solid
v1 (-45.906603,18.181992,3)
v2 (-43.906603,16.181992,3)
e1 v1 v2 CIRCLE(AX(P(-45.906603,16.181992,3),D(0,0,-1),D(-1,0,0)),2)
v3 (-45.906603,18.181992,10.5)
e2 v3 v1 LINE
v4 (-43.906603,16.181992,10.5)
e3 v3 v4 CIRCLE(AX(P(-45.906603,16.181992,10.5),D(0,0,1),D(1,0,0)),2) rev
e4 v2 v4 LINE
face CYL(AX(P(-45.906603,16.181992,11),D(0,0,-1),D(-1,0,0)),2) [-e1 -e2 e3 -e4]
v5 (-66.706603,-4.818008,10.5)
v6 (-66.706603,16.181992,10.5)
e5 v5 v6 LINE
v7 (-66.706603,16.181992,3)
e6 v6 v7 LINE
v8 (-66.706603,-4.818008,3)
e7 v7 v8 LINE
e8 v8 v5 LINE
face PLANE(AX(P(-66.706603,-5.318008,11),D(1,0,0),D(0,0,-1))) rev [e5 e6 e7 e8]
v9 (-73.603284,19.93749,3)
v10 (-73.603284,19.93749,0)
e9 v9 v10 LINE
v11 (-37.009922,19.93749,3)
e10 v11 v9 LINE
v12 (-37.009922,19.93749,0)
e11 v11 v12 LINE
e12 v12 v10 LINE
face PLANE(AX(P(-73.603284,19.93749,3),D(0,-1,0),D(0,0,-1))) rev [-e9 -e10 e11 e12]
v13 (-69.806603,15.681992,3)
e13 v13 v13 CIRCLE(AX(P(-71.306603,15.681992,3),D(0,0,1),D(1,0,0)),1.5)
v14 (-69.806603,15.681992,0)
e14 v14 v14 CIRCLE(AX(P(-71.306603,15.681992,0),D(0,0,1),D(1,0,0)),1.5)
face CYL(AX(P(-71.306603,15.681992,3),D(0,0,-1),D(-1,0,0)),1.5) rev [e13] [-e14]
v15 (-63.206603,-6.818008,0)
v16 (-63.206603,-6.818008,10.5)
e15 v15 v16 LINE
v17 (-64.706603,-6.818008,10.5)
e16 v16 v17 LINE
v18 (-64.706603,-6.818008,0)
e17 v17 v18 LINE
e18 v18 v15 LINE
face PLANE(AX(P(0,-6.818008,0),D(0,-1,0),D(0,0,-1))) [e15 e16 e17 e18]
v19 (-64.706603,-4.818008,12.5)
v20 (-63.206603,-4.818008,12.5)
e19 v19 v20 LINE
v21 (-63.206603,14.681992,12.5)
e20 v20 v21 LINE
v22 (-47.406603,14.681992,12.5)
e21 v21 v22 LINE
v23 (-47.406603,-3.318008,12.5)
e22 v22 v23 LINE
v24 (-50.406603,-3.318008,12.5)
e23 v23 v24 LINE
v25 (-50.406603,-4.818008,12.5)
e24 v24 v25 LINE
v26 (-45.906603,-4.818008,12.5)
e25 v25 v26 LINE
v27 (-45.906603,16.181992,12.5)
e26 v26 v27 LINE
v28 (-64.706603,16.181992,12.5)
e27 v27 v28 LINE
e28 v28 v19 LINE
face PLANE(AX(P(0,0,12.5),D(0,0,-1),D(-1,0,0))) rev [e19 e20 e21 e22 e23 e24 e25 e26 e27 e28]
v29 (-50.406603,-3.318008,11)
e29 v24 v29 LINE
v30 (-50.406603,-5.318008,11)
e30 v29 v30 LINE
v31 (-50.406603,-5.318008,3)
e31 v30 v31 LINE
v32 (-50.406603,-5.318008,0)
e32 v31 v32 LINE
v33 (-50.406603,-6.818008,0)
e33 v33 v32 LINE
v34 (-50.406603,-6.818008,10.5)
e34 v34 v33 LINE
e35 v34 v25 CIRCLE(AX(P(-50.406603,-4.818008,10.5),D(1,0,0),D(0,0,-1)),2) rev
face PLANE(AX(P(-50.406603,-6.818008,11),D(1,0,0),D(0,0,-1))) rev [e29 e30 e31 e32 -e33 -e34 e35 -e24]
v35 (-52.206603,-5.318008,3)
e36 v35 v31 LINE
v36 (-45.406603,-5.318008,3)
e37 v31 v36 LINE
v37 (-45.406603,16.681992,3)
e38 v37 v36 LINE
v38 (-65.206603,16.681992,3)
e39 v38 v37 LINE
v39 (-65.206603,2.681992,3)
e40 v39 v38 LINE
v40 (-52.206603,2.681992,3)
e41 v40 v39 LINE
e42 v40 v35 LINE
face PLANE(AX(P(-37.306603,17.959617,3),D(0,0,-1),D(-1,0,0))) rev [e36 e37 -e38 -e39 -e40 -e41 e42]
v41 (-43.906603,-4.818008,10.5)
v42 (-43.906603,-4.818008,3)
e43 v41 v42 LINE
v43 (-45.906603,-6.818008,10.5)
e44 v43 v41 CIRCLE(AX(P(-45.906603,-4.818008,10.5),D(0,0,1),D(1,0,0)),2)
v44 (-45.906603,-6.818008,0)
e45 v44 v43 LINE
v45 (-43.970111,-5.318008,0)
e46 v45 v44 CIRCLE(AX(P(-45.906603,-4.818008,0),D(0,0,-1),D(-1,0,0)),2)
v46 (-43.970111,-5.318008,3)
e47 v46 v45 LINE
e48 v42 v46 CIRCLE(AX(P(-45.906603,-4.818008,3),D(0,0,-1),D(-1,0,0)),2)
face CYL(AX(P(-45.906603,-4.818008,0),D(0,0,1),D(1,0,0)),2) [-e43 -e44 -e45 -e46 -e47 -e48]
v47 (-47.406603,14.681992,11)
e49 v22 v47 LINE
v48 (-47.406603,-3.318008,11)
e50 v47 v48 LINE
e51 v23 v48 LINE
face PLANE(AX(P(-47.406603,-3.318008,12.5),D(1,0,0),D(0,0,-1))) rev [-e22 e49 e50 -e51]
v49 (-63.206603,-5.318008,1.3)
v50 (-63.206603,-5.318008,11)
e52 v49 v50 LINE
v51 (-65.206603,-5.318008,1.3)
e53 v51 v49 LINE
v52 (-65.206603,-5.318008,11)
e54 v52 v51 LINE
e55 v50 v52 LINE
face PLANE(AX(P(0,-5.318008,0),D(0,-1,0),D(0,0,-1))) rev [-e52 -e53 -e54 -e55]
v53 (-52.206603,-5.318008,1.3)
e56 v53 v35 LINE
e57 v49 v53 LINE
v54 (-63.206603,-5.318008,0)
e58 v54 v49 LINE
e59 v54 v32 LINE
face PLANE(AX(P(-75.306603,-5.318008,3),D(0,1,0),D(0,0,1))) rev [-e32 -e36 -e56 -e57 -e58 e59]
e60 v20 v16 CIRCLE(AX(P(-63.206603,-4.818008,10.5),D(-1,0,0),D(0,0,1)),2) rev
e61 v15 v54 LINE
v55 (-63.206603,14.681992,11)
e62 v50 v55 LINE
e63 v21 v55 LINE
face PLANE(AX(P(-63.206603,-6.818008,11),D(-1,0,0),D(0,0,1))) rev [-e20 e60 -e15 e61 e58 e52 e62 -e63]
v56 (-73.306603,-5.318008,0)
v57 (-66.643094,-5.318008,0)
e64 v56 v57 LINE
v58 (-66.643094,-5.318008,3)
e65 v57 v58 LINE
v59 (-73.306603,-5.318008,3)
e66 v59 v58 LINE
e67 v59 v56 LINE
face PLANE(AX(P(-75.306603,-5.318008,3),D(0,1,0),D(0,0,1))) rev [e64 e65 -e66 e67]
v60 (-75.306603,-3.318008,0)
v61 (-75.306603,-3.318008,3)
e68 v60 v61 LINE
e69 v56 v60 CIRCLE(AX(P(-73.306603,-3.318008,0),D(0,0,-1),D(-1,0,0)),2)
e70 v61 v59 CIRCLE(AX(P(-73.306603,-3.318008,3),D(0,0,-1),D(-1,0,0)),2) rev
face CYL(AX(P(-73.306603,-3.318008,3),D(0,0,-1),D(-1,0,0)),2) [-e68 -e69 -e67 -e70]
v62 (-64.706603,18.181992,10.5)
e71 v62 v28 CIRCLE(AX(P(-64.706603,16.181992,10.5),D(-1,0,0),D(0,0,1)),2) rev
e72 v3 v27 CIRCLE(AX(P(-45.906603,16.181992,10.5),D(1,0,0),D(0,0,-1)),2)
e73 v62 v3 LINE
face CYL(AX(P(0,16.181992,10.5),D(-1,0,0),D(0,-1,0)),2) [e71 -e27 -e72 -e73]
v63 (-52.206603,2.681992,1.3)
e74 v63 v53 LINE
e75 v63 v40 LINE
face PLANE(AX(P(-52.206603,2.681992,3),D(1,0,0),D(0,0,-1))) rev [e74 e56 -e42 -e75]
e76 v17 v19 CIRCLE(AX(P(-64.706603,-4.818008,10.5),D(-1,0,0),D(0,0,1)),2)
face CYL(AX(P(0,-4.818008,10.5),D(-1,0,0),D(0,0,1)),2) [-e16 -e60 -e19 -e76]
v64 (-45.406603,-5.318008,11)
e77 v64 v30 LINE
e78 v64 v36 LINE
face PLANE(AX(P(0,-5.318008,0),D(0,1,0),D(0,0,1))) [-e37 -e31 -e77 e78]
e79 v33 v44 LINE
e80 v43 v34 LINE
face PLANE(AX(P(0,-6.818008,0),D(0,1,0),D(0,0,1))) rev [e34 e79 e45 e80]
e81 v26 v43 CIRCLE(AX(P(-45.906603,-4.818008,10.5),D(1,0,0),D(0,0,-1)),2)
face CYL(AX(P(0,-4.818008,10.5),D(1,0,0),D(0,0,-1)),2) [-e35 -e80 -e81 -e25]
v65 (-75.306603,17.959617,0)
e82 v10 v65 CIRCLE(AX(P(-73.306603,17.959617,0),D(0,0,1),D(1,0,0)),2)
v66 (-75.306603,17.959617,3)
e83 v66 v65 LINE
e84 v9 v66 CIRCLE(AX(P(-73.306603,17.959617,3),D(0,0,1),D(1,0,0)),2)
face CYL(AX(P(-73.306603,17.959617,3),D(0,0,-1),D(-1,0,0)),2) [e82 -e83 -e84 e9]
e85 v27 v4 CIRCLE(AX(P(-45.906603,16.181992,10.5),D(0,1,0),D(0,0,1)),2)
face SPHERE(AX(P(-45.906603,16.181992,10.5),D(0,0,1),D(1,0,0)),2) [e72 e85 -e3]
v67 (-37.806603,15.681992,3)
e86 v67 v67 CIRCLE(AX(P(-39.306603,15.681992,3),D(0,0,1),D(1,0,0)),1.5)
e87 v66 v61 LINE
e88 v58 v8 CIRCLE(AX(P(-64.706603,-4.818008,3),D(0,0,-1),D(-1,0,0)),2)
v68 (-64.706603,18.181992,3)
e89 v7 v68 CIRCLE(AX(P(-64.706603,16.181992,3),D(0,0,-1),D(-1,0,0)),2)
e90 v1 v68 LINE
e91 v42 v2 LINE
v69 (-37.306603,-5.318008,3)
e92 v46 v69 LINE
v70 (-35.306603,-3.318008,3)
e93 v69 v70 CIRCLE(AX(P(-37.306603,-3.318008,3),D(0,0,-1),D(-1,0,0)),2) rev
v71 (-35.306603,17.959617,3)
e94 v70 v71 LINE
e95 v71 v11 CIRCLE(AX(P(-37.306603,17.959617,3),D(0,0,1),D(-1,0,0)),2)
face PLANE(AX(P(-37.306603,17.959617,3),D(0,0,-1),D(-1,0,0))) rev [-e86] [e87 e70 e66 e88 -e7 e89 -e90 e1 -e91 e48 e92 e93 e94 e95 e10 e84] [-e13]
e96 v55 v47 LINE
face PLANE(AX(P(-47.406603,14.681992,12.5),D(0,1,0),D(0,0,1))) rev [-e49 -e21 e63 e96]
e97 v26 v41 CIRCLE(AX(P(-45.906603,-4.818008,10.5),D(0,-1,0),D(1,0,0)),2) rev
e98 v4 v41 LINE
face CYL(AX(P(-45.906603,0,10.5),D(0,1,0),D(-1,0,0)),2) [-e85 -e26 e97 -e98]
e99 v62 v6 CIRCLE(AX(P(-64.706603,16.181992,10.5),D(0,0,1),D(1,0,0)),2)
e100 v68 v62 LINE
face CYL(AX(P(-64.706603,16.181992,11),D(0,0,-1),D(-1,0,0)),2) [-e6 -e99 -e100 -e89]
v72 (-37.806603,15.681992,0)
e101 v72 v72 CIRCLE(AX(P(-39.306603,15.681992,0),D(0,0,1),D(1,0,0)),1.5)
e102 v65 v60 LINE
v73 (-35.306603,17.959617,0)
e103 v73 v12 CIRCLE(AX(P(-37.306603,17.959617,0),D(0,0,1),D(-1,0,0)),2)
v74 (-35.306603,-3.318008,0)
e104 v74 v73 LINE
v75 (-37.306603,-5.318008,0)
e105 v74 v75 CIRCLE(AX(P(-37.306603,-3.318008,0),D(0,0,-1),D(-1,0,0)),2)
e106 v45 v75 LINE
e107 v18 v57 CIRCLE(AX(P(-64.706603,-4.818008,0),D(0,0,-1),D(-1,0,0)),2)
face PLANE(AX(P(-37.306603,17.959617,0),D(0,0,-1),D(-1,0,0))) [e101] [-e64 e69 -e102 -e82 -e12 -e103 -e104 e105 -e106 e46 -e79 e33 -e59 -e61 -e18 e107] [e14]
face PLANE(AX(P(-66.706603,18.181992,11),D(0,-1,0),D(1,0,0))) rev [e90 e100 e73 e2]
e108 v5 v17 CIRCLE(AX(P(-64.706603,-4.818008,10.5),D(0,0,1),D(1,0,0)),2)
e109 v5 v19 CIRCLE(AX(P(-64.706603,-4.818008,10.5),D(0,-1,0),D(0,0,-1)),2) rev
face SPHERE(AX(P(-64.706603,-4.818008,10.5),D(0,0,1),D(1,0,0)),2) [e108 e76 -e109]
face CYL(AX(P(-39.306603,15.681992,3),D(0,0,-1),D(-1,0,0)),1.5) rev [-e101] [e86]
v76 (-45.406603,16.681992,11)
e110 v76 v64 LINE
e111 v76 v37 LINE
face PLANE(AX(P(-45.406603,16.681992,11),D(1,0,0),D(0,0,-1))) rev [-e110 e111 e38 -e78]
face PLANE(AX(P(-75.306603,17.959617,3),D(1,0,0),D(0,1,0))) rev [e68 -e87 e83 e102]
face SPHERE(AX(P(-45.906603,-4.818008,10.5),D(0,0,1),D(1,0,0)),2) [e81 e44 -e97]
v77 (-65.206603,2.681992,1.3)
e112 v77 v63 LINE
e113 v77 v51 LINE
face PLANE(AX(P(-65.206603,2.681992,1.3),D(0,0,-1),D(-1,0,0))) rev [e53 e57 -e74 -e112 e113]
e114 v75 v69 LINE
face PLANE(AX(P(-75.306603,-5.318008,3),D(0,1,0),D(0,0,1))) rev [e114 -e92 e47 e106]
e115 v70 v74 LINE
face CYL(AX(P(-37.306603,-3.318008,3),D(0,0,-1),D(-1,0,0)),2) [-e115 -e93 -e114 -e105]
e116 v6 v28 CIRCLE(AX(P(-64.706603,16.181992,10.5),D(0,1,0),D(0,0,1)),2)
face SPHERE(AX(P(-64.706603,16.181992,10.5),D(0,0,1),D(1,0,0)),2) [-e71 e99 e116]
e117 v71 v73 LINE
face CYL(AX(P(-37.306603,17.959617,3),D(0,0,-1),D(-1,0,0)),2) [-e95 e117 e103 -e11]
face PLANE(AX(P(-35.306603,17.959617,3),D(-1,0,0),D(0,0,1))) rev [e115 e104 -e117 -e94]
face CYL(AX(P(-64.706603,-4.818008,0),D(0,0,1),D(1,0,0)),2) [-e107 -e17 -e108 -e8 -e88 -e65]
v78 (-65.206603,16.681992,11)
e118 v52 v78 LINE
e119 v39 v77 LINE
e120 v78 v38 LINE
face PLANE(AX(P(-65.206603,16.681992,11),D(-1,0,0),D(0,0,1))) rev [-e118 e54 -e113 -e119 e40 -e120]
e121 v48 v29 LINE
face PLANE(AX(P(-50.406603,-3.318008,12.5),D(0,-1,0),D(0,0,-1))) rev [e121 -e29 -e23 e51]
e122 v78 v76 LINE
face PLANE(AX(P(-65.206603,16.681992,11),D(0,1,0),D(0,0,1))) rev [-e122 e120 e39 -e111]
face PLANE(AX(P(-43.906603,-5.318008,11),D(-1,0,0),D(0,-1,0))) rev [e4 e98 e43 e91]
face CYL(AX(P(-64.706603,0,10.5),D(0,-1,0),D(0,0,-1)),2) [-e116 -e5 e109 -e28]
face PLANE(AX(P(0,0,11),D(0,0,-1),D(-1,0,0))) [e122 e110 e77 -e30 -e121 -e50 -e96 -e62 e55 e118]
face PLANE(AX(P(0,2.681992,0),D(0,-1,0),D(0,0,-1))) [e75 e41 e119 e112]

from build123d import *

# Parameters (mm, degrees)
CROQUIS1_R              = 1.5
SALIENTE_EXTRUIR1_DEPTH = 3
SALIENTE_EXTRUIR2_DEPTH = 8
CROQUIS3_W              = 13
CROQUIS3_H              = 1.7
CORTAR_EXTRUIR1_DEPTH   = 8
CROQUIS5_W              = 3.5
CROQUIS5_H              = 11
CROQUIS5_W_2            = 6.5
SALIENTE_EXTRUIR3_DEPTH = 1.5
SALIENTE_EXTRUIR4_DEPTH = 1.5
REDONDEO1_R             = 2


with BuildPart() as part:
    # Croquis1 → Saliente-Extruir1 (new body)
    with BuildSketch(Plane.XY):
        with BuildLine():
            Line((-75.306602598, 17.959617496), (-75.306602598, -5.318007663))
            Line((-75.306602598, -5.318007663), (-35.306602598, -5.318007663))
            Line((-35.306602598, -5.318007663), (-35.306602598, 17.959617496))
            ThreePointArc((-35.306602598, 17.959617496), (-35.791122177, 19.26473017), (-37.009921692, 19.937490201))
            Line((-37.009921692, 19.937490201), (-73.603283504, 19.937490201))
            ThreePointArc((-73.603283504, 19.937490201), (-74.822083019, 19.26473017), (-75.306602598, 17.959617496))
        make_face()
        with Locations((-71.306602598, 15.681992337)):
            Circle(CROQUIS1_R, mode=Mode.SUBTRACT)
        with Locations((-39.306602598, 15.681992337)):
            Circle(CROQUIS1_R, mode=Mode.SUBTRACT)
    extrude(amount=SALIENTE_EXTRUIR1_DEPTH)

    # Croquis2 → Saliente-Extruir2 (add)
    with BuildSketch(Plane.XY.offset(3)):
        Polygon((-66.706602598, -5.318007663), (-65.206602598, -5.318007663), (-65.206602598, 16.681992337), (-45.406602598, 16.681992337), (-45.406602598, -5.318007663), (-43.906602598, -5.318007663), (-43.906602598, 18.181992337), (-66.706602598, 18.181992337), align=None)
    extrude(amount=SALIENTE_EXTRUIR2_DEPTH)

    # Croquis3 → Cortar-Extruir1 (cut)
    with BuildSketch(Plane.XZ.offset(5.318007663)):
        with Locations((-58.706602598, 2.15)):
            Rectangle(CROQUIS3_W, CROQUIS3_H)
    extrude(amount=-CORTAR_EXTRUIR1_DEPTH, mode=Mode.SUBTRACT)

    # Croquis5 → Saliente-Extruir3 (add)
    with BuildSketch(Plane.XZ.offset(5.318007663)):
        with Locations((-64.956602598, 5.5)):
            Rectangle(CROQUIS5_W, CROQUIS5_H)
        with Locations((-47.156602598, 5.5)):
            Rectangle(CROQUIS5_W_2, CROQUIS5_H)
    extrude(amount=SALIENTE_EXTRUIR3_DEPTH)

    # Croquis6 → Saliente-Extruir4 (add)
    with BuildSketch(Plane.XY.offset(11)):
        Polygon((-63.206602598, -5.318007663), (-63.206602598, -6.818007663), (-66.706602598, -6.818007663), (-66.706602598, 18.181992337), (-43.906602598, 18.181992337), (-43.906602598, -6.818007663), (-50.406602598, -6.818007663), (-50.406602598, -3.318007663), (-47.406602598, -3.318007663), (-47.406602598, 14.681992337), (-63.206602598, 14.681992337), align=None)
    extrude(amount=SALIENTE_EXTRUIR4_DEPTH)

    # Redondeo1
    # the kernel refuses this fillet: 2 mm, written as the material it takes off along each edge
    with BuildSketch(Plane(origin=(-45.906602598, -4.818007663, 10.5), x_dir=(1, 0, 0), z_dir=(0, 0, 1))) as redondeo1_piece_1_section:
        Polygon((0, 0), (REDONDEO1_R * 1.02, 0), (REDONDEO1_R * 1.02, -REDONDEO1_R * 1.02), (0, -REDONDEO1_R * 1.02), align=None)
    redondeo1_piece_1 = extrude(amount=REDONDEO1_R * 1.02, mode=Mode.PRIVATE)
    redondeo1_piece_1 = redondeo1_piece_1 - Plane(origin=(-45.906602598, -4.818007663, 10.5), x_dir=(-0.7071067811865477, 0.7071067811865474, 0), z_dir=(0, 0, 1)) * Sphere(REDONDEO1_R, mode=Mode.PRIVATE)
    add(redondeo1_piece_1, mode=Mode.SUBTRACT)
    with BuildSketch(Plane(origin=(-45.906602598, 16.181992337, 10.5), x_dir=(0, 1, 0), z_dir=(0, 0, 1))) as redondeo1_piece_2_section:
        Polygon((0, 0), (REDONDEO1_R * 1.02, 0), (REDONDEO1_R * 1.02, -REDONDEO1_R * 1.02), (0, -REDONDEO1_R * 1.02), align=None)
    redondeo1_piece_2 = extrude(amount=REDONDEO1_R * 1.02, mode=Mode.PRIVATE)
    redondeo1_piece_2 = redondeo1_piece_2 - Plane(origin=(-45.906602598, 16.181992337, 10.5), x_dir=(-0.7071067811865471, -0.7071067811865477, 0), z_dir=(0, 0, 1)) * Sphere(REDONDEO1_R, mode=Mode.PRIVATE)
    add(redondeo1_piece_2, mode=Mode.SUBTRACT)
    with BuildSketch(Plane(origin=(-64.706602598, 16.181992337, 10.5), x_dir=(0, 1, 0), z_dir=(0, 0, 1))) as redondeo1_piece_3_section:
        Polygon((0, 0), (REDONDEO1_R * 1.02, 0), (REDONDEO1_R * 1.02, REDONDEO1_R * 1.02), (0, REDONDEO1_R * 1.02), align=None)
    redondeo1_piece_3 = extrude(amount=REDONDEO1_R * 1.02, mode=Mode.PRIVATE)
    redondeo1_piece_3 = redondeo1_piece_3 - Plane(origin=(-64.706602598, 16.181992337, 10.5), x_dir=(0.7071067811865477, -0.7071067811865475, 0), z_dir=(0, 0, 1)) * Sphere(REDONDEO1_R, mode=Mode.PRIVATE)
    add(redondeo1_piece_3, mode=Mode.SUBTRACT)
    with BuildSketch(Plane(origin=(-64.706602598, -4.818007663, 10.5), x_dir=(-1, 0, 0), z_dir=(0, 0, 1))) as redondeo1_piece_4_section:
        Polygon((0, 0), (REDONDEO1_R * 1.02, 0), (REDONDEO1_R * 1.02, REDONDEO1_R * 1.02), (0, REDONDEO1_R * 1.02), align=None)
    redondeo1_piece_4 = extrude(amount=REDONDEO1_R * 1.02, mode=Mode.PRIVATE)
    redondeo1_piece_4 = redondeo1_piece_4 - Plane(origin=(-64.706602598, -4.818007663, 10.5), x_dir=(0.7071067811865475, 0.7071067811865475, 0), z_dir=(0, 0, 1)) * Sphere(REDONDEO1_R, mode=Mode.PRIVATE)
    add(redondeo1_piece_4, mode=Mode.SUBTRACT)
    with BuildSketch(Plane(origin=(-35.306602598, -5.318007663, -5), x_dir=(-1, 0, 0), z_dir=(0, 0, 1))) as redondeo1_piece_5:
        with BuildLine():
            CenterArc((REDONDEO1_R, -REDONDEO1_R), REDONDEO1_R, 90, 90)
            Line((0, -REDONDEO1_R), (0, 0))
            Line((0, 0), (REDONDEO1_R, 0))
        make_face()
    extrude(amount=13, mode=Mode.SUBTRACT)
    with BuildSketch(Plane(origin=(-45.906602598, -6.818007663, 12.5), x_dir=(0, 0, -1), z_dir=(-1, 0, 0))) as redondeo1_piece_6:
        with BuildLine():
            CenterArc((REDONDEO1_R, -REDONDEO1_R), REDONDEO1_R, 90, 90)
            Line((0, -REDONDEO1_R), (0, 0))
            Line((0, 0), (REDONDEO1_R, 0))
        make_face()
    extrude(amount=9.5, mode=Mode.SUBTRACT)
    with BuildSketch(Plane(origin=(-43.906602598, 16.181992337, 12.5), x_dir=(-1, 0, 0), z_dir=(0, -1, 0))) as redondeo1_piece_7:
        with BuildLine():
            CenterArc((REDONDEO1_R, REDONDEO1_R), REDONDEO1_R, 180, 90)
            Line((0, REDONDEO1_R), (0, 0))
            Line((0, 0), (REDONDEO1_R, 0))
        make_face()
    extrude(amount=21, mode=Mode.SUBTRACT)
    with BuildSketch(Plane(origin=(-64.706602598, 18.181992337, 12.5), x_dir=(0, -1, 0), z_dir=(1, 0, 0))) as redondeo1_piece_8:
        with BuildLine():
            CenterArc((REDONDEO1_R, REDONDEO1_R), REDONDEO1_R, 180, 90)
            Line((0, REDONDEO1_R), (0, 0))
            Line((0, 0), (REDONDEO1_R, 0))
        make_face()
    extrude(amount=18.8, mode=Mode.SUBTRACT)
    with BuildSketch(Plane(origin=(-75.306602598, -5.318007663, -5), x_dir=(1, 0, 0), z_dir=(0, 0, 1))) as redondeo1_piece_9:
        with BuildLine():
            CenterArc((REDONDEO1_R, REDONDEO1_R), REDONDEO1_R, 180, 90)
            Line((0, REDONDEO1_R), (0, 0))
            Line((0, 0), (REDONDEO1_R, 0))
        make_face()
    extrude(amount=13, mode=Mode.SUBTRACT)
    with BuildSketch(Plane(origin=(-66.706602598, -4.818007663, 12.5), x_dir=(0, 0, -1), z_dir=(0, 1, 0))) as redondeo1_piece_10:
        with BuildLine():
            CenterArc((REDONDEO1_R, -REDONDEO1_R), REDONDEO1_R, 90, 90)
            Line((0, -REDONDEO1_R), (0, 0))
            Line((0, 0), (REDONDEO1_R, 0))
        make_face()
    extrude(amount=21, mode=Mode.SUBTRACT)
    with BuildSketch(Plane(origin=(-58.206602598, -6.818007663, 12.5), x_dir=(0, 0, -1), z_dir=(-1, 0, 0))) as redondeo1_piece_11:
        with BuildLine():
            CenterArc((REDONDEO1_R, -REDONDEO1_R), REDONDEO1_R, 90, 90)
            Line((0, -REDONDEO1_R), (0, 0))
            Line((0, 0), (REDONDEO1_R, 0))
        make_face()
    extrude(amount=6.5, mode=Mode.SUBTRACT)
    with BuildSketch(Plane(origin=(-66.706602598, 18.181992337, 10.5), x_dir=(0, -1, 0), z_dir=(0, 0, -1))) as redondeo1_piece_12:
        with BuildLine():
            CenterArc((REDONDEO1_R, -REDONDEO1_R), REDONDEO1_R, 90, 90)
            Line((0, -REDONDEO1_R), (0, 0))
            Line((0, 0), (REDONDEO1_R, 0))
        make_face()
    extrude(amount=7.5, mode=Mode.SUBTRACT)
    with BuildSketch(Plane(origin=(-43.906602598, 18.181992337, 3), x_dir=(-1, 0, 0), z_dir=(0, 0, 1))) as redondeo1_piece_13:
        with BuildLine():
            CenterArc((REDONDEO1_R, REDONDEO1_R), REDONDEO1_R, 180, 90)
            Line((0, REDONDEO1_R), (0, 0))
            Line((0, 0), (REDONDEO1_R, 0))
        make_face()
    extrude(amount=7.5, mode=Mode.SUBTRACT)
    with BuildSketch(Plane(origin=(-66.706602598, -6.818007663, -5), x_dir=(0, 1, 0), z_dir=(0, 0, 1))) as redondeo1_piece_14_section:
        with BuildLine():
            CenterArc((REDONDEO1_R, -REDONDEO1_R), REDONDEO1_R, 90, 90)
            Line((0, -REDONDEO1_R), (0, 0))
            Line((0, 0), (REDONDEO1_R, 0))
        make_face()
    redondeo1_piece_14 = extrude(amount=15.5, mode=Mode.PRIVATE)
    redondeo1_piece_14 = split(redondeo1_piece_14, bisect_by=Plane(origin=(-66.254561414, -5.318007663, 1.5), z_dir=(0, -1, 0)), keep=Keep.TOP, mode=Mode.PRIVATE)
    add(redondeo1_piece_14, mode=Mode.SUBTRACT)
    with BuildSketch(Plane(origin=(-66.706602598, -6.818007663, -5), x_dir=(0, 1, 0), z_dir=(0, 0, 1))) as redondeo1_piece_15_section:
        with BuildLine():
            CenterArc((REDONDEO1_R, -REDONDEO1_R), REDONDEO1_R, 90, 90)
            Line((0, -REDONDEO1_R), (0, 0))
            Line((0, 0), (REDONDEO1_R, 0))
        make_face()
    redondeo1_piece_15 = extrude(amount=15.5, mode=Mode.PRIVATE)
    redondeo1_piece_15 = split(redondeo1_piece_15, bisect_by=Plane(origin=(-66.687603103, -5.193408024, 3), z_dir=(0, 0, 1)), keep=Keep.TOP, mode=Mode.PRIVATE)
    add(redondeo1_piece_15, mode=Mode.SUBTRACT)
    with BuildSketch(Plane(origin=(-43.906602598, -6.818007663, -5), x_dir=(-1, 0, 0), z_dir=(0, 0, 1))) as redondeo1_piece_16_section:
        with BuildLine():
            CenterArc((REDONDEO1_R, -REDONDEO1_R), REDONDEO1_R, 90, 90)
            Line((0, -REDONDEO1_R), (0, 0))
            Line((0, 0), (REDONDEO1_R, 0))
        make_face()
    redondeo1_piece_16 = extrude(amount=15.5, mode=Mode.PRIVATE)
    redondeo1_piece_16 = split(redondeo1_piece_16, bisect_by=Plane(origin=(-44.358643782, -5.318007663, 1.5), z_dir=(0, -1, 0)), keep=Keep.TOP, mode=Mode.PRIVATE)
    add(redondeo1_piece_16, mode=Mode.SUBTRACT)
    with BuildSketch(Plane(origin=(-43.906602598, -6.818007663, -5), x_dir=(-1, 0, 0), z_dir=(0, 0, 1))) as redondeo1_piece_17_section:
        with BuildLine():
            CenterArc((REDONDEO1_R, -REDONDEO1_R), REDONDEO1_R, 90, 90)
            Line((0, -REDONDEO1_R), (0, 0))
            Line((0, 0), (REDONDEO1_R, 0))
        make_face()
    redondeo1_piece_17 = extrude(amount=15.5, mode=Mode.PRIVATE)
    redondeo1_piece_17 = split(redondeo1_piece_17, bisect_by=Plane(origin=(-43.925602093, -5.193408024, 3), z_dir=(0, 0, 1)), keep=Keep.TOP, mode=Mode.PRIVATE)
    add(redondeo1_piece_17, mode=Mode.SUBTRACT)


solid = part.part
